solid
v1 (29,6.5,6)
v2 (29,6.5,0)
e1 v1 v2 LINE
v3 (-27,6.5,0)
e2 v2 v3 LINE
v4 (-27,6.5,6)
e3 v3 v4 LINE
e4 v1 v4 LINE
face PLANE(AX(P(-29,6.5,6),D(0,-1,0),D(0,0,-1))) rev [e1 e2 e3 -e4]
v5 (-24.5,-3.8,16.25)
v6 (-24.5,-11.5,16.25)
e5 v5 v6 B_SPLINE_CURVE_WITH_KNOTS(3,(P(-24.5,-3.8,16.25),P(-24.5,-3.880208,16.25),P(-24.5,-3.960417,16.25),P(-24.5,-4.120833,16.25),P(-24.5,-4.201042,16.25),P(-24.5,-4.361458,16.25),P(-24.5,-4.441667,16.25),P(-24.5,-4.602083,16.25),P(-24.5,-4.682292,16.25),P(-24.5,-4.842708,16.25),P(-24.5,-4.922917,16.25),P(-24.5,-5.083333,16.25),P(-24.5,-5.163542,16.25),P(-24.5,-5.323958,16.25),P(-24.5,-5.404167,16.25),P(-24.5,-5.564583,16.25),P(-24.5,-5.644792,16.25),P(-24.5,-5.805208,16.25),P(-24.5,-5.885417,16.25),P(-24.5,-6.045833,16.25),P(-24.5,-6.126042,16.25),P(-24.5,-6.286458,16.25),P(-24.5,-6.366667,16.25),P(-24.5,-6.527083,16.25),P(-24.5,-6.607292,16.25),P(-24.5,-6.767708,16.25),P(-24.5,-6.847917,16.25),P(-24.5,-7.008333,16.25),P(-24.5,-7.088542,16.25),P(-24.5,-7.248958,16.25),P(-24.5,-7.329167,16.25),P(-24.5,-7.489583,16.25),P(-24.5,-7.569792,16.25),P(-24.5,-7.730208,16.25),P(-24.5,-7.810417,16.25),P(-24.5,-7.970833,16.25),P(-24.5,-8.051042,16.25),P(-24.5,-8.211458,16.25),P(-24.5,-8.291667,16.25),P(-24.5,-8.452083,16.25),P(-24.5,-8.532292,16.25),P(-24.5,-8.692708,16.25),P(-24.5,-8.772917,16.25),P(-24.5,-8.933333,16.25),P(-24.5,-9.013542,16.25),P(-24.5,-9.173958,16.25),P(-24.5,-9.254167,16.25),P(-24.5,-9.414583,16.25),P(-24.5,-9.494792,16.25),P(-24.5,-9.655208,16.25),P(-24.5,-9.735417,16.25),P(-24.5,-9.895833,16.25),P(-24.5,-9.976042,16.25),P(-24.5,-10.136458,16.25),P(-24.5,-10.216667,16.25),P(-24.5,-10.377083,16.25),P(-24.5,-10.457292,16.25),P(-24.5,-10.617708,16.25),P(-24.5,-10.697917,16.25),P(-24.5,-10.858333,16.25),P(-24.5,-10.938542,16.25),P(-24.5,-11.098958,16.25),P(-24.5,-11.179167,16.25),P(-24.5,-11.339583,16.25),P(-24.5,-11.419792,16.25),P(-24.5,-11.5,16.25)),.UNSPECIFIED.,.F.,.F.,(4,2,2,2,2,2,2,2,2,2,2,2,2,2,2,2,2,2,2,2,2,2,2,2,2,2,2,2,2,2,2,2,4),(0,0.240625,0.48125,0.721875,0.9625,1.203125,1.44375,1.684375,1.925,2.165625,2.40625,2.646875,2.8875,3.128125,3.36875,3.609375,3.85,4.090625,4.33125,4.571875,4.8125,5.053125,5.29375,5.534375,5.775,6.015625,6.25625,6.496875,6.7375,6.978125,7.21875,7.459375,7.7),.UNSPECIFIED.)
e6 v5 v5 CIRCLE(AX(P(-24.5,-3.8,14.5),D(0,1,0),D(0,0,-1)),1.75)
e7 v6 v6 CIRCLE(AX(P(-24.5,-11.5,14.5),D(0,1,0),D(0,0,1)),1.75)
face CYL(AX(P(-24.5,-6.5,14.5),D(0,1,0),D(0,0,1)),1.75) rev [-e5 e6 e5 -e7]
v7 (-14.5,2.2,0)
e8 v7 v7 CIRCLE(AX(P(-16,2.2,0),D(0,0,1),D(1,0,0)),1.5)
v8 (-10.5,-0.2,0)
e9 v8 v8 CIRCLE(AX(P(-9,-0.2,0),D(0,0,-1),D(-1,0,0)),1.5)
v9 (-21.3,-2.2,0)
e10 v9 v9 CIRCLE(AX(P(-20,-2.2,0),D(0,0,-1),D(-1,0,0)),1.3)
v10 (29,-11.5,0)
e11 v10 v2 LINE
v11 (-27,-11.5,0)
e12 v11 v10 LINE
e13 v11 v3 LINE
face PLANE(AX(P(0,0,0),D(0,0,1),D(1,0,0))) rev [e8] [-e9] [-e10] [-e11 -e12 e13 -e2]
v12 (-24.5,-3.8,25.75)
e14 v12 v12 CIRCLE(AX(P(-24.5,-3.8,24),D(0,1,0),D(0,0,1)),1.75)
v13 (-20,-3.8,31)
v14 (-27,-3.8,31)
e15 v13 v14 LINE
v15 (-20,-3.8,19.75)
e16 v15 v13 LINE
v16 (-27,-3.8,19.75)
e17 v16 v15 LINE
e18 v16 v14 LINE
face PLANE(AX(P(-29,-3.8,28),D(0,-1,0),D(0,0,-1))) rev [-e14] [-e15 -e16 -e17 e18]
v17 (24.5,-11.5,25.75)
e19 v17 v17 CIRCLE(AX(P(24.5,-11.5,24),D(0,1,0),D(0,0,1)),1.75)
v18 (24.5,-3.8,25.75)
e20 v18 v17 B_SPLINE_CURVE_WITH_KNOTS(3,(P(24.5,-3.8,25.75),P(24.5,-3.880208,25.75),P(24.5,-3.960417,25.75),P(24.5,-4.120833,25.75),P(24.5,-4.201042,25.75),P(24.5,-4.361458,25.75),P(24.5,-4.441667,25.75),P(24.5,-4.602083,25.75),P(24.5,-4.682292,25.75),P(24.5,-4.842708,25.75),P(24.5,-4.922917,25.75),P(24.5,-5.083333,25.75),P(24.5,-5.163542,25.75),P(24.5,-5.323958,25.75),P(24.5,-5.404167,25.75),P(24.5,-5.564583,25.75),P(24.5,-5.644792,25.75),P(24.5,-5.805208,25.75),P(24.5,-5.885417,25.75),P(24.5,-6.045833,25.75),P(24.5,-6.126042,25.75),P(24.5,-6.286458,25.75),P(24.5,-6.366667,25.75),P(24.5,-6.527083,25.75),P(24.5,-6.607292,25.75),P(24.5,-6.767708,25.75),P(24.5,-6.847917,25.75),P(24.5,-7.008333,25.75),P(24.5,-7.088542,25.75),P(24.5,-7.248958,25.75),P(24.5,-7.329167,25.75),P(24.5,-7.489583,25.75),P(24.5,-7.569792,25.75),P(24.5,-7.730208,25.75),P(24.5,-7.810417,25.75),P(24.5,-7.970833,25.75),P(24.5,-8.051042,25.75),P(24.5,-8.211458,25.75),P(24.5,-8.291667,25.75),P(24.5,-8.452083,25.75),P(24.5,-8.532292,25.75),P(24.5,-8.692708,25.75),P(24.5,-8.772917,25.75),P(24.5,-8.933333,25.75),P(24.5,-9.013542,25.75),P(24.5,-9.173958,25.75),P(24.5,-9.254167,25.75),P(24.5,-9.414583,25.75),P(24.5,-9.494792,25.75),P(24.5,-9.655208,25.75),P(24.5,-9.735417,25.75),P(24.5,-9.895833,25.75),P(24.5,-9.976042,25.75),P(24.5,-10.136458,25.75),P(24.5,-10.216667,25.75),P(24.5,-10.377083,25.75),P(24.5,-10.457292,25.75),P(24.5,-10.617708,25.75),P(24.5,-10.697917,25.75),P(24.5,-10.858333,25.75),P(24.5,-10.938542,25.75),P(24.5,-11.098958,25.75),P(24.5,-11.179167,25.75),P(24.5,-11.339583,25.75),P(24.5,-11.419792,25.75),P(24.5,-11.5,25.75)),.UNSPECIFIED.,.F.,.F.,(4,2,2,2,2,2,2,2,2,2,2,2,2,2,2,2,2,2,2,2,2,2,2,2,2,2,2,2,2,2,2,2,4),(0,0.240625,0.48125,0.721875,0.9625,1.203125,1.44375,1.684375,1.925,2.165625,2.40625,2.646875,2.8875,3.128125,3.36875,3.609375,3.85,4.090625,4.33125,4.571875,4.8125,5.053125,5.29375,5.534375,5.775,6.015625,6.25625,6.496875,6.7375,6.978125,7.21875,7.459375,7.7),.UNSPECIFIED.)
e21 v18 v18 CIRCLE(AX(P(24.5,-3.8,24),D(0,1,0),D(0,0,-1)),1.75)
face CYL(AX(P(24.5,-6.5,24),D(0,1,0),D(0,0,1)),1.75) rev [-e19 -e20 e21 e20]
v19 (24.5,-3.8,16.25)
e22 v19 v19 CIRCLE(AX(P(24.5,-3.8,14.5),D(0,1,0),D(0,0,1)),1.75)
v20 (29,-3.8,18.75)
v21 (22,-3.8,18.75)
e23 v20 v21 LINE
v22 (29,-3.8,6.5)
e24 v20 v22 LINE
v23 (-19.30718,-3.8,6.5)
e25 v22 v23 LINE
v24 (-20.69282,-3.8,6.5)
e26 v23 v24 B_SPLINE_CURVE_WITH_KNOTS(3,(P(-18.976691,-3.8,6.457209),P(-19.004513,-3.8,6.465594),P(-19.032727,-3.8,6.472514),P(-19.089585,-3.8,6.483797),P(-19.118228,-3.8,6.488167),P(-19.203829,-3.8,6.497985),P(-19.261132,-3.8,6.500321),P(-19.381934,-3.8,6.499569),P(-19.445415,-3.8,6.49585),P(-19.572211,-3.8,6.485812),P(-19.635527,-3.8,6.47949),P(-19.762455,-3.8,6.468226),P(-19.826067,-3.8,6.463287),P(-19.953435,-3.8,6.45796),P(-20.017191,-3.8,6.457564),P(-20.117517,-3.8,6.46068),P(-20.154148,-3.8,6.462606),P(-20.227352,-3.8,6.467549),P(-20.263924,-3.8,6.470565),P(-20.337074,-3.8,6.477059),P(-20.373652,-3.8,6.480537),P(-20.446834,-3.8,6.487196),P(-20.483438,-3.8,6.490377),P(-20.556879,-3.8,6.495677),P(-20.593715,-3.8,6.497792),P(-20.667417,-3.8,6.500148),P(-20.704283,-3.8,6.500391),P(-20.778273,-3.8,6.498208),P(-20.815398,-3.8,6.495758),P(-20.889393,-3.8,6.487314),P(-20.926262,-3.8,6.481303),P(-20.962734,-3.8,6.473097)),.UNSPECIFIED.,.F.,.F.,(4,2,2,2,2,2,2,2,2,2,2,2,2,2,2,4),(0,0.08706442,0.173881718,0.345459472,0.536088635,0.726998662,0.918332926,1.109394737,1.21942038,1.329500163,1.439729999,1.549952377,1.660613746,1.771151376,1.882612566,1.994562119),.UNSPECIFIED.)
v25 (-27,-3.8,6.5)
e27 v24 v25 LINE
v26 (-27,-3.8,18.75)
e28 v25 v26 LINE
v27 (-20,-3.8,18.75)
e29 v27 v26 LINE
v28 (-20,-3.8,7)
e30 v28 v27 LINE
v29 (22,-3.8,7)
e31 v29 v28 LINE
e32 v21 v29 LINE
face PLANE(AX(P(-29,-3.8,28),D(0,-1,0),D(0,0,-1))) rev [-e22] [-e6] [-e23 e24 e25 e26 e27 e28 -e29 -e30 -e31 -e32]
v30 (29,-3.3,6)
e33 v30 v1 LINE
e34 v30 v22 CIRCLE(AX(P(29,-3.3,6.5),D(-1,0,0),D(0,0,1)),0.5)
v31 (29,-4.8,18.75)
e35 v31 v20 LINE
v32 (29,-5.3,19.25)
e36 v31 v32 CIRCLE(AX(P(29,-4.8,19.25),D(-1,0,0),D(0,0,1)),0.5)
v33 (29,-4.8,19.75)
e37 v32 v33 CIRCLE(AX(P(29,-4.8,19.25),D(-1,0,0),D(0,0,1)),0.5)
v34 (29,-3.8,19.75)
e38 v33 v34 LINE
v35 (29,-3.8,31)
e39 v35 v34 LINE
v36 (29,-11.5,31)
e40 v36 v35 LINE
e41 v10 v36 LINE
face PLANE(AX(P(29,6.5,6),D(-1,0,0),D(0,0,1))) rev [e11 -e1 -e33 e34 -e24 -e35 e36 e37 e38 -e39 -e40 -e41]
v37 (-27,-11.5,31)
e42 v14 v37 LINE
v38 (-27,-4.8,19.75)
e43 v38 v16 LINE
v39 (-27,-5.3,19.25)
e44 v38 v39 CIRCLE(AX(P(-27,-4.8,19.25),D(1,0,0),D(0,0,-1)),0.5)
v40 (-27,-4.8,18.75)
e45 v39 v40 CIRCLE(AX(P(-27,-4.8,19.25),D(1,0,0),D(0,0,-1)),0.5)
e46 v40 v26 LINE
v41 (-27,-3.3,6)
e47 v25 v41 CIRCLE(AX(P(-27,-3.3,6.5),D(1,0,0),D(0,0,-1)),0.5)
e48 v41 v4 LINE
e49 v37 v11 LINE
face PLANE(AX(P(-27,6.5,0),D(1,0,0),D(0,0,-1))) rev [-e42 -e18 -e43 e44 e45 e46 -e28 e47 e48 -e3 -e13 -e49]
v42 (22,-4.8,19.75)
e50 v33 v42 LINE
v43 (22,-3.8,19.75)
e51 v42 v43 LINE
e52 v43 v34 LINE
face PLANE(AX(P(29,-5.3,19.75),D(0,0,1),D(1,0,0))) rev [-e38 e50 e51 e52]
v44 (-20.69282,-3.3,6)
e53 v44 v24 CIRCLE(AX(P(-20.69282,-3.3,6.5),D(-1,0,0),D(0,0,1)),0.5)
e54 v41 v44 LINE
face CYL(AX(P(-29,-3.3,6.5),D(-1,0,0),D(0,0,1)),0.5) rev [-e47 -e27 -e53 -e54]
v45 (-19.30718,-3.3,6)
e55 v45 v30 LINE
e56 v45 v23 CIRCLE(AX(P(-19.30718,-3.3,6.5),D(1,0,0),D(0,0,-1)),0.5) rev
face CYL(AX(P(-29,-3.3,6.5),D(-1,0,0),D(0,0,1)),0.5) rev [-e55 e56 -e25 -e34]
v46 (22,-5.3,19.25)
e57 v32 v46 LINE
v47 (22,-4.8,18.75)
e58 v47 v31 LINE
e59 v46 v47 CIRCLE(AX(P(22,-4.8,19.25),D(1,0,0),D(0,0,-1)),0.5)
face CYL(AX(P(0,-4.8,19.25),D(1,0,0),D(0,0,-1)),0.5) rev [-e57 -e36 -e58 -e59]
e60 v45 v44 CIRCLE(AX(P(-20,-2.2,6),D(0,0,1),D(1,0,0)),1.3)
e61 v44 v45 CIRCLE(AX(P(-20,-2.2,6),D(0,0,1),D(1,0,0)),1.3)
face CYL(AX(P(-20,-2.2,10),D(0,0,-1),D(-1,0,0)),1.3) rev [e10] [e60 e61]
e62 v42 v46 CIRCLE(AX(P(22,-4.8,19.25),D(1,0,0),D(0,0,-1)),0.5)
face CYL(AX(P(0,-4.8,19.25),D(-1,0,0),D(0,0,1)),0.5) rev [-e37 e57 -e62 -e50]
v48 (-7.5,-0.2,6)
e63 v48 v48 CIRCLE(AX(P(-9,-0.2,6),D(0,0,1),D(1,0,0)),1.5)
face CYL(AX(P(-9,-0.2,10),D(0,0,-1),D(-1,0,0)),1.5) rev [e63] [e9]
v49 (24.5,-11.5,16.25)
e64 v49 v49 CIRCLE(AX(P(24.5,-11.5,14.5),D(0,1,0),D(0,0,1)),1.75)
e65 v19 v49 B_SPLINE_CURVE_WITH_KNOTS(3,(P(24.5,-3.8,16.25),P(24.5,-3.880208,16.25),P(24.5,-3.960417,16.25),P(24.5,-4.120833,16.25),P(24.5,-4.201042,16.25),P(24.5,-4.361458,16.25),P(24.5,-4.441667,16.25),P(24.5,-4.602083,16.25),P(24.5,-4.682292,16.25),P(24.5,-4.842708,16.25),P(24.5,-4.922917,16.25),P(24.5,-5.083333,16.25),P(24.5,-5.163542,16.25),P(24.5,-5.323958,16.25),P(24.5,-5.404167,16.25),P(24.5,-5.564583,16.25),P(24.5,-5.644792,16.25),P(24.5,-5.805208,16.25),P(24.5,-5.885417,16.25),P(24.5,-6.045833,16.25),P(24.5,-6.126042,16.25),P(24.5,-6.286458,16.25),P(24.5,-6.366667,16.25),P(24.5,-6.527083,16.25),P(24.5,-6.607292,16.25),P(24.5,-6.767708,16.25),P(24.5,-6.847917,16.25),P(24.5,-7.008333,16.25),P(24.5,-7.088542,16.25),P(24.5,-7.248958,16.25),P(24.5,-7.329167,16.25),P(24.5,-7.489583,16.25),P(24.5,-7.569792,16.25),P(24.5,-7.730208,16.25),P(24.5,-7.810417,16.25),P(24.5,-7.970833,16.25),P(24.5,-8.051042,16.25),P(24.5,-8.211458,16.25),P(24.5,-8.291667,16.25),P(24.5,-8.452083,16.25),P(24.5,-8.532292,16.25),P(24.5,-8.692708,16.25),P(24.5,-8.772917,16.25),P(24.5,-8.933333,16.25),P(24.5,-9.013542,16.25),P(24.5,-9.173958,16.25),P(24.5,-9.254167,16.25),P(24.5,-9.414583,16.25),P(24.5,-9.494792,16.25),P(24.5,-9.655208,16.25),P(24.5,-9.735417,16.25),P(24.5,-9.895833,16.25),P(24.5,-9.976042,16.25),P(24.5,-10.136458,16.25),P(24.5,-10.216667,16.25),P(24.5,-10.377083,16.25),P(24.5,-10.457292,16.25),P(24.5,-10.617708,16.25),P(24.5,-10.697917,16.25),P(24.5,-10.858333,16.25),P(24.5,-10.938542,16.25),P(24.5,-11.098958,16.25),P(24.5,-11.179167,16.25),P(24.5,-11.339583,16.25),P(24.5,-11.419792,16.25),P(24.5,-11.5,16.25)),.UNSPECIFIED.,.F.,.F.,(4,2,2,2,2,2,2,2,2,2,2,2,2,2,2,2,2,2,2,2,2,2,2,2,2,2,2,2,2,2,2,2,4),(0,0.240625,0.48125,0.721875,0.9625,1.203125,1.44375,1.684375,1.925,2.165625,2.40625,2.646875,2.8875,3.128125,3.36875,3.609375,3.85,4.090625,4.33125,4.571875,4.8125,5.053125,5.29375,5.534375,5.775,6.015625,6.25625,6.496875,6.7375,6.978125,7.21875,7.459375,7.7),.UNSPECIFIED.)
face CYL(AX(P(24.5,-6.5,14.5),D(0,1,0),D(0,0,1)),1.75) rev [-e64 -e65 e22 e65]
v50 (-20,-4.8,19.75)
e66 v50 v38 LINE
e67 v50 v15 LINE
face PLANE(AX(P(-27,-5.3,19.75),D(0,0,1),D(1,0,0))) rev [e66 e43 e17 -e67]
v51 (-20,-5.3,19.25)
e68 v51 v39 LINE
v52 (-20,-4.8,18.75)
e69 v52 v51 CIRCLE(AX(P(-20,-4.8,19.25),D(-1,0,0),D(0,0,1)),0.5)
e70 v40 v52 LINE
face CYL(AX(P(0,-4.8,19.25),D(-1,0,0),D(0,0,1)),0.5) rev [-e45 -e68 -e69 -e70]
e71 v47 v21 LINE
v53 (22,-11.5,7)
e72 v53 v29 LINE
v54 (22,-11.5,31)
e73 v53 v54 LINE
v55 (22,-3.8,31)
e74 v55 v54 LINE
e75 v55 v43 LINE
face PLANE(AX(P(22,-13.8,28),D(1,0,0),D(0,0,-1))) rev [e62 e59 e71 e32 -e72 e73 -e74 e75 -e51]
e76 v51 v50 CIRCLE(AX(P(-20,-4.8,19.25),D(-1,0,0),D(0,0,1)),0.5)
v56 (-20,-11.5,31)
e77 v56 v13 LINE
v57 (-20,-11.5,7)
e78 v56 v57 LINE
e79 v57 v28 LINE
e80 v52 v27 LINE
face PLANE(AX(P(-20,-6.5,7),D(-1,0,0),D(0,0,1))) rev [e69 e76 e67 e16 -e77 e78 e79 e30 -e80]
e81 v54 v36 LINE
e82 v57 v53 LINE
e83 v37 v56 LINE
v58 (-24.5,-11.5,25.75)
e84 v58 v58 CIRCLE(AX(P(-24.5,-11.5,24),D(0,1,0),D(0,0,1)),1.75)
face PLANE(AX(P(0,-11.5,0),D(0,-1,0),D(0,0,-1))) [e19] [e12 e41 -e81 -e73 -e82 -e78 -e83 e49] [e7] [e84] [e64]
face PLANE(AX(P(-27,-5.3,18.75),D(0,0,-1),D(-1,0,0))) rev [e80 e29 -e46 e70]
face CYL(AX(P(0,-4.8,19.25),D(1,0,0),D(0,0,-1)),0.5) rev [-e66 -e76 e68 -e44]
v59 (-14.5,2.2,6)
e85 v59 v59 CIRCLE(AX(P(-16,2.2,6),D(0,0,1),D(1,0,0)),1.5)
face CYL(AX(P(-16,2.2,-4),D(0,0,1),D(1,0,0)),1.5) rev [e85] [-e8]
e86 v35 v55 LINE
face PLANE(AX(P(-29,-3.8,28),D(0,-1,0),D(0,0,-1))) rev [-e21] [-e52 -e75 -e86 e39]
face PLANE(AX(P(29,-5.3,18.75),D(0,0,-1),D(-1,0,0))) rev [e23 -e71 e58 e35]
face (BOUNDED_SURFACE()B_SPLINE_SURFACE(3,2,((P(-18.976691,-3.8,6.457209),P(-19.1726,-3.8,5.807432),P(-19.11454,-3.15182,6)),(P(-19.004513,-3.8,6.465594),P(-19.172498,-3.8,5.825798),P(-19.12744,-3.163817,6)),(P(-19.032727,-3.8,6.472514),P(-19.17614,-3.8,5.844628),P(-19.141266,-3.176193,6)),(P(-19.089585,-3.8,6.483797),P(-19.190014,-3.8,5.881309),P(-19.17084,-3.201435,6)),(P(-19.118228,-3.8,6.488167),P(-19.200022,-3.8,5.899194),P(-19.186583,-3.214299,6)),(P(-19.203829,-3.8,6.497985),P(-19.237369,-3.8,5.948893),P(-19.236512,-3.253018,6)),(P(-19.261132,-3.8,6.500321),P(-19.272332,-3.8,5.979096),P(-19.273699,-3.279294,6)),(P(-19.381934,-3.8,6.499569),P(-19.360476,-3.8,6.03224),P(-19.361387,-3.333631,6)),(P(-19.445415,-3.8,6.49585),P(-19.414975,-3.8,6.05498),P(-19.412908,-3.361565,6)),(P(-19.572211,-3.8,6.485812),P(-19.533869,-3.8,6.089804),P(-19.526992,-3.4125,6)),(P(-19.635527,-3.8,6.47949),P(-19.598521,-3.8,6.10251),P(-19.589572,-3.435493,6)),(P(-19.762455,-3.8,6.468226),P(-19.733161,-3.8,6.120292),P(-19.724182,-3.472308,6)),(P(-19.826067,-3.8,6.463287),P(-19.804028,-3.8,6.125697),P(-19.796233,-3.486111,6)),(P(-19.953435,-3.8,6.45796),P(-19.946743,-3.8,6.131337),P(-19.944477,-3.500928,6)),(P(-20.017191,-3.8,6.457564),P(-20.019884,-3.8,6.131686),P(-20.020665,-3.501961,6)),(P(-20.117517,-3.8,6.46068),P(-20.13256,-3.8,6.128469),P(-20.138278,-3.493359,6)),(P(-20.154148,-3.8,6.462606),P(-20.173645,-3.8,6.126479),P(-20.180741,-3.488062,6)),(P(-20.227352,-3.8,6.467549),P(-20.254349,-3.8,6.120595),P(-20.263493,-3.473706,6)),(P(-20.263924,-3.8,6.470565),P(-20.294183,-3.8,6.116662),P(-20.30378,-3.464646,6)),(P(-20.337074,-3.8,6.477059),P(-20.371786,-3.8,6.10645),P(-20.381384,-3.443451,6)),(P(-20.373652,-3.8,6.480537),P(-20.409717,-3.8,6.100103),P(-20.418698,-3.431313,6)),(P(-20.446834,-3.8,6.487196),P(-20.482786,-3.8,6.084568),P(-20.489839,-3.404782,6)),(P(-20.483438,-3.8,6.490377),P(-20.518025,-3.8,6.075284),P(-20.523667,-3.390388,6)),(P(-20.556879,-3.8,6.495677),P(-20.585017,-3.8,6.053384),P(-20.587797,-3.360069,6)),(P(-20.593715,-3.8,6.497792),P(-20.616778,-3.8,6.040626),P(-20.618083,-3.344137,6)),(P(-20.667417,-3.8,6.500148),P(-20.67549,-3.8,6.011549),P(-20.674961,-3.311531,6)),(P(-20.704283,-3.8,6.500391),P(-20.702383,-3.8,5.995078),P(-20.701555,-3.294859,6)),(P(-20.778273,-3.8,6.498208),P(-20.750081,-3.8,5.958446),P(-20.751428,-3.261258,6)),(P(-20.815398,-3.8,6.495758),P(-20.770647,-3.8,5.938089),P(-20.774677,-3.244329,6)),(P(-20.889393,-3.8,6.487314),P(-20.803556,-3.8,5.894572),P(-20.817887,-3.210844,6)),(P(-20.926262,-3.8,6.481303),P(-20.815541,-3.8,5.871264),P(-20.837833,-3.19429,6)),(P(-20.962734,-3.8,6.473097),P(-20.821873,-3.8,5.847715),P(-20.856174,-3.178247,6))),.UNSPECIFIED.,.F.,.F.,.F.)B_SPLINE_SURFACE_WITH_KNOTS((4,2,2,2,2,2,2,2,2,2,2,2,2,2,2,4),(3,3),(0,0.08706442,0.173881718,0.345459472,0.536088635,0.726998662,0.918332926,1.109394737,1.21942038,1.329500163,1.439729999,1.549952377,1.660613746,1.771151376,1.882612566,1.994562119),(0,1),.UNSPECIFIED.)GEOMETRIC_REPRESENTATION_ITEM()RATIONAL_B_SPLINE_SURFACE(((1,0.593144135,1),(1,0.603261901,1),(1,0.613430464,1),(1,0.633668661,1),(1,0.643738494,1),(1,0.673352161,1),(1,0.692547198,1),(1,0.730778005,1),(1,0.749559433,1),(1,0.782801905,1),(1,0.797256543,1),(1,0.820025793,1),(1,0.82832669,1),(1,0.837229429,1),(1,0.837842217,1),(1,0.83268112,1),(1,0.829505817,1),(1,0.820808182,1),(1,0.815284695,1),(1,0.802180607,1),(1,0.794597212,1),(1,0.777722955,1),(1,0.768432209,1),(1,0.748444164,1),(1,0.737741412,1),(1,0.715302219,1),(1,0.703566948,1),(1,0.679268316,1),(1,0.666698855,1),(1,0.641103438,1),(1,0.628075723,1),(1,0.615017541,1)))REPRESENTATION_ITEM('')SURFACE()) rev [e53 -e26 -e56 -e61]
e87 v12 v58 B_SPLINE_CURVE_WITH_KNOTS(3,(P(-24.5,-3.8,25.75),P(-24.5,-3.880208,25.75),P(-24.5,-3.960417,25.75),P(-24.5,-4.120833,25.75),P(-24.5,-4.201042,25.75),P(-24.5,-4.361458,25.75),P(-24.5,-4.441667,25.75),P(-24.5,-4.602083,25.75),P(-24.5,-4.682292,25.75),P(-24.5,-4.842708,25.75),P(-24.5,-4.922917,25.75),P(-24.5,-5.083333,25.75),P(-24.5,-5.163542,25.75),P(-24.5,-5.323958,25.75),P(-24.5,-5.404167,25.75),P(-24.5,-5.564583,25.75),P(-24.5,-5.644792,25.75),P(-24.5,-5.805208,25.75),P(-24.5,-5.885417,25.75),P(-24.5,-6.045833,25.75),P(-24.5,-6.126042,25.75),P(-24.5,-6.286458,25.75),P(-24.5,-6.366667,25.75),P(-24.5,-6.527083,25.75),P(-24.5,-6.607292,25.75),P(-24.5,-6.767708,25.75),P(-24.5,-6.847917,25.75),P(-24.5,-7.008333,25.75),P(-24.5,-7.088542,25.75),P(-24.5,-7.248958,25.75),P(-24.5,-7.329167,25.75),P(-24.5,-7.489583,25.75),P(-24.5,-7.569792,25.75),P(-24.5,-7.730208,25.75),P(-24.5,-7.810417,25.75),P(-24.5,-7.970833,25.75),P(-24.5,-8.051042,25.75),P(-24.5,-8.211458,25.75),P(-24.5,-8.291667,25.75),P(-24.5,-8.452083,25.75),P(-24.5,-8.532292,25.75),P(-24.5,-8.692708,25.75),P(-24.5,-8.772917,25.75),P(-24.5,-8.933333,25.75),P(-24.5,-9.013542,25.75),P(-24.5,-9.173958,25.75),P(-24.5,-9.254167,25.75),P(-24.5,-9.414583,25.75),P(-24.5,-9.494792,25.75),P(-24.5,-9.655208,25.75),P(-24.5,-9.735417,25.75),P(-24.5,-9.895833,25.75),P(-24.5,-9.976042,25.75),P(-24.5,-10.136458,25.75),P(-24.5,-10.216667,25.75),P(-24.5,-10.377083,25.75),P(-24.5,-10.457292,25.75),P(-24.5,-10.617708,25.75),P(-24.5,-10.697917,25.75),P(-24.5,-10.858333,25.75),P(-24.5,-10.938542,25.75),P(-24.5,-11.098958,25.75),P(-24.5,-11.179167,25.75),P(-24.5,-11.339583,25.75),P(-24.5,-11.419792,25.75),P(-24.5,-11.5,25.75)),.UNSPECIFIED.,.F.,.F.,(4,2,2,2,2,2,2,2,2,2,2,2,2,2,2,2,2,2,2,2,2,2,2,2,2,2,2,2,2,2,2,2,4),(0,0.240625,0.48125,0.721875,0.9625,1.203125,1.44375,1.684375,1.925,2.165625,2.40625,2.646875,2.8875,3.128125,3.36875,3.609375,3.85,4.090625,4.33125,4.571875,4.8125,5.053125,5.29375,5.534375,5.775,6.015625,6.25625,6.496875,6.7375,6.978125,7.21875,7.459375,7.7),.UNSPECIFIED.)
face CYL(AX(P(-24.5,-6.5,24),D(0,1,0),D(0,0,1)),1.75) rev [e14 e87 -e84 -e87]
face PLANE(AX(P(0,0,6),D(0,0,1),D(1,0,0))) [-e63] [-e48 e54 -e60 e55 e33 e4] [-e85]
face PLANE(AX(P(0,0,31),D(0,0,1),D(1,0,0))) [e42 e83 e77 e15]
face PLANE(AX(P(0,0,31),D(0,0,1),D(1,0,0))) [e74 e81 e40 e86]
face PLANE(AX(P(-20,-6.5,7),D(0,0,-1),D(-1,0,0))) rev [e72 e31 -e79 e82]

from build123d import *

# Parameters (mm, degrees)
SKETCH_1_W           = 58
SKETCH_1_H           = 13
EXTRUDE_1_DEPTH      = 6
SKETCH_9_W           = 58
SKETCH_9_H           = 2.7
EXTRUDE_5_DEPTH      = 22
SKETCH_10_R          = 1.75
CUT_EXTRUDE_6_DEPTH  = 42.606369705
SKETCH_11_W          = 40
SKETCH_11_H          = 20
CUT_EXTRUDE_7_DEPTH  = 42.606369705
SKETCH_13_W          = 2
SKETCH_13_H          = 13
CUT_EXTRUDE_8_DEPTH  = 41.831972766
SKETCH_3_R           = 1.3
SKETCH_3_R_2         = 1.5
CUT_EXTRUDE_9_DEPTH  = 10
SKETCH_14_W          = 40
SKETCH_14_H          = 20
EXTRUDE_6_DEPTH      = 5
SKETCH_15_R          = 1.75
CUT_EXTRUDE_10_DEPTH = 42.606369705
SKETCH_16_W          = 40
SKETCH_16_H          = 1
CUT_EXTRUDE_11_DEPTH = 10
SKETCH_17_W          = 2
SKETCH_17_H          = 21
CUT_EXTRUDE_13_DEPTH = 10
SKETCH_18_W          = 7
SKETCH_18_H          = 1
CUT_EXTRUDE_14_DEPTH = 1.5
FILLET_1_R           = 0.5
SKETCH_21_R          = 1.5
CUT_EXTRUDE_16_DEPTH = 10
FILLET_4_R           = 0.5
SKETCH_23_W          = 7
SKETCH_23_H          = 7.7
EXTRUDE_7_DEPTH      = 3


with BuildPart() as part:
    # 草图1 → 凸台-拉伸1 (new body)
    with BuildSketch(Plane.XY):
        Rectangle(SKETCH_1_W, SKETCH_1_H)
    extrude(amount=EXTRUDE_1_DEPTH)

    # 草图9 → 凸台-拉伸5 (add)
    with BuildSketch(Plane.XY.offset(6)):
        with Locations((0, -5.15)):
            Rectangle(SKETCH_9_W, SKETCH_9_H)
    extrude(amount=EXTRUDE_5_DEPTH)

    # 草图10 → 切除-拉伸6 (cut, through all)
    with BuildSketch(Plane(origin=(0, -3.8, 0), x_dir=(1, 0, 0), z_dir=(0, 1, 0))):
        with Locations(Location((-24.5, -24, 0), (0, 0, 270))):
            Circle(SKETCH_10_R)
        with Locations(Location((-24.5, -14.5, 0), (0, 0, 270))):
            Circle(SKETCH_10_R)
        with Locations(Location((24.5, -24, 0), (0, 0, 270))):
            Circle(SKETCH_10_R)
        with Locations(Location((24.5, -14.5, 0), (0, 0, 270))):
            Circle(SKETCH_10_R)
    extrude(amount=-CUT_EXTRUDE_6_DEPTH, mode=Mode.SUBTRACT)

    # 草图11 → 切除-拉伸7 (cut, through all)
    with BuildSketch(Plane(origin=(0, -3.8, 0), x_dir=(1, 0, 0), z_dir=(0, 1, 0))):
        with Locations((0, -17)):
            Rectangle(SKETCH_11_W, SKETCH_11_H)
    extrude(amount=-CUT_EXTRUDE_7_DEPTH, mode=Mode.SUBTRACT)

    # 草图13 → 切除-拉伸8 (cut, through all)
    with BuildSketch(Plane.XY.offset(28)):
        with Locations((-28, 0)):
            Rectangle(SKETCH_13_W, SKETCH_13_H)
    extrude(amount=-CUT_EXTRUDE_8_DEPTH, mode=Mode.SUBTRACT)

    # 草图3 → 切除-拉伸9 (cut)
    with BuildSketch(Plane(origin=(0, 0, 0), x_dir=(-1, 0, 0), z_dir=(0, 0, -1))):
        with Locations((20, -2.2)):
            Circle(SKETCH_3_R)
        with Locations((9, -0.2)):
            Circle(SKETCH_3_R_2)
    extrude(amount=-CUT_EXTRUDE_9_DEPTH, mode=Mode.SUBTRACT)

    # 草图14 → 凸台-拉伸6 (add)
    with BuildSketch(Plane.XZ.offset(6.5)):
        Polygon((-27, 28), (-20, 28), (20, 28), (29, 28), (29, 0), (-20, 0), (-27, 0), align=None)
        with Locations((0, 17)):
            Rectangle(SKETCH_14_W, SKETCH_14_H, mode=Mode.SUBTRACT)
    extrude(amount=EXTRUDE_6_DEPTH)

    # 草图15 → 切除-拉伸10 (cut, through all)
    with BuildSketch(Plane(origin=(0, -3.8, 0), x_dir=(1, 0, 0), z_dir=(0, 1, 0))):
        with Locations(Location((-24.5, -14.5, 0), (0, 0, 270))):
            Circle(SKETCH_15_R)
        with Locations(Location((-24.5, -24, 0), (0, 0, 270))):
            Circle(SKETCH_15_R)
        with Locations(Location((24.5, -14.5, 0), (0, 0, 270))):
            Circle(SKETCH_15_R)
        with Locations(Location((24.5, -24, 0), (0, 0, 270))):
            Circle(SKETCH_15_R)
    extrude(amount=-CUT_EXTRUDE_10_DEPTH, mode=Mode.SUBTRACT)

    # 草图16 → 切除-拉伸11 (cut)
    with BuildSketch(Plane(origin=(0, -3.8, 0), x_dir=(1, 0, 0), z_dir=(0, 1, 0))):
        with Locations((0, -27.5)):
            Rectangle(SKETCH_16_W, SKETCH_16_H)
    extrude(amount=-CUT_EXTRUDE_11_DEPTH, mode=Mode.SUBTRACT)

    # 草图17 → 切除-拉伸13 (cut)
    with BuildSketch(Plane(origin=(0, -3.8, 0), x_dir=(1, 0, 0), z_dir=(0, 1, 0))):
        with Locations((21, -17.5)):
            Rectangle(SKETCH_17_W, SKETCH_17_H)
    extrude(amount=-CUT_EXTRUDE_13_DEPTH, mode=Mode.SUBTRACT)

    # 草图18 → 切除-拉伸14 (cut)
    with BuildSketch(Plane(origin=(0, -3.8, 0), x_dir=(1, 0, 0), z_dir=(0, 1, 0))):
        with Locations((-23.5, -19.25)):
            Rectangle(SKETCH_18_W, SKETCH_18_H)
        with Locations((25.5, -19.25)):
            Rectangle(SKETCH_18_W, SKETCH_18_H)
    extrude(amount=-CUT_EXTRUDE_14_DEPTH, mode=Mode.SUBTRACT)

    # 圆角1
    fillet_1_edges = [part.edges().sort_by_distance(p)[0] for p in [
        (1, -3.8, 6),
    ]]
    fillet(fillet_1_edges, radius=FILLET_1_R)

    # 草图21 → 切除-拉伸16 (cut)
    with BuildSketch(Plane.XY.offset(6)):
        with Locations((-16, 2.2)):
            Circle(SKETCH_21_R)
    extrude(amount=-CUT_EXTRUDE_16_DEPTH, mode=Mode.SUBTRACT)

    # 圆角4
    fillet_4_edges = [part.edges().sort_by_distance(p)[0] for p in [
        (25.5, -5.3, 19.75),
        (25.5, -5.3, 18.75),
        (-23.5, -5.3, 19.75),
        (-23.5, -5.3, 18.75),
    ]]
    fillet(fillet_4_edges, radius=FILLET_4_R - 0.0001)  # a hair under: the kernel refuses the full size

    # 草图23 → 凸台-拉伸7 (add)
    with BuildSketch(Plane.XY.offset(28)):
        with Locations((-23.5, -7.65)):
            Rectangle(SKETCH_23_W, SKETCH_23_H)
        with Locations((25.5, -7.65)):
            Rectangle(SKETCH_23_W, SKETCH_23_H)
    extrude(amount=EXTRUDE_7_DEPTH)


solid = part.part
